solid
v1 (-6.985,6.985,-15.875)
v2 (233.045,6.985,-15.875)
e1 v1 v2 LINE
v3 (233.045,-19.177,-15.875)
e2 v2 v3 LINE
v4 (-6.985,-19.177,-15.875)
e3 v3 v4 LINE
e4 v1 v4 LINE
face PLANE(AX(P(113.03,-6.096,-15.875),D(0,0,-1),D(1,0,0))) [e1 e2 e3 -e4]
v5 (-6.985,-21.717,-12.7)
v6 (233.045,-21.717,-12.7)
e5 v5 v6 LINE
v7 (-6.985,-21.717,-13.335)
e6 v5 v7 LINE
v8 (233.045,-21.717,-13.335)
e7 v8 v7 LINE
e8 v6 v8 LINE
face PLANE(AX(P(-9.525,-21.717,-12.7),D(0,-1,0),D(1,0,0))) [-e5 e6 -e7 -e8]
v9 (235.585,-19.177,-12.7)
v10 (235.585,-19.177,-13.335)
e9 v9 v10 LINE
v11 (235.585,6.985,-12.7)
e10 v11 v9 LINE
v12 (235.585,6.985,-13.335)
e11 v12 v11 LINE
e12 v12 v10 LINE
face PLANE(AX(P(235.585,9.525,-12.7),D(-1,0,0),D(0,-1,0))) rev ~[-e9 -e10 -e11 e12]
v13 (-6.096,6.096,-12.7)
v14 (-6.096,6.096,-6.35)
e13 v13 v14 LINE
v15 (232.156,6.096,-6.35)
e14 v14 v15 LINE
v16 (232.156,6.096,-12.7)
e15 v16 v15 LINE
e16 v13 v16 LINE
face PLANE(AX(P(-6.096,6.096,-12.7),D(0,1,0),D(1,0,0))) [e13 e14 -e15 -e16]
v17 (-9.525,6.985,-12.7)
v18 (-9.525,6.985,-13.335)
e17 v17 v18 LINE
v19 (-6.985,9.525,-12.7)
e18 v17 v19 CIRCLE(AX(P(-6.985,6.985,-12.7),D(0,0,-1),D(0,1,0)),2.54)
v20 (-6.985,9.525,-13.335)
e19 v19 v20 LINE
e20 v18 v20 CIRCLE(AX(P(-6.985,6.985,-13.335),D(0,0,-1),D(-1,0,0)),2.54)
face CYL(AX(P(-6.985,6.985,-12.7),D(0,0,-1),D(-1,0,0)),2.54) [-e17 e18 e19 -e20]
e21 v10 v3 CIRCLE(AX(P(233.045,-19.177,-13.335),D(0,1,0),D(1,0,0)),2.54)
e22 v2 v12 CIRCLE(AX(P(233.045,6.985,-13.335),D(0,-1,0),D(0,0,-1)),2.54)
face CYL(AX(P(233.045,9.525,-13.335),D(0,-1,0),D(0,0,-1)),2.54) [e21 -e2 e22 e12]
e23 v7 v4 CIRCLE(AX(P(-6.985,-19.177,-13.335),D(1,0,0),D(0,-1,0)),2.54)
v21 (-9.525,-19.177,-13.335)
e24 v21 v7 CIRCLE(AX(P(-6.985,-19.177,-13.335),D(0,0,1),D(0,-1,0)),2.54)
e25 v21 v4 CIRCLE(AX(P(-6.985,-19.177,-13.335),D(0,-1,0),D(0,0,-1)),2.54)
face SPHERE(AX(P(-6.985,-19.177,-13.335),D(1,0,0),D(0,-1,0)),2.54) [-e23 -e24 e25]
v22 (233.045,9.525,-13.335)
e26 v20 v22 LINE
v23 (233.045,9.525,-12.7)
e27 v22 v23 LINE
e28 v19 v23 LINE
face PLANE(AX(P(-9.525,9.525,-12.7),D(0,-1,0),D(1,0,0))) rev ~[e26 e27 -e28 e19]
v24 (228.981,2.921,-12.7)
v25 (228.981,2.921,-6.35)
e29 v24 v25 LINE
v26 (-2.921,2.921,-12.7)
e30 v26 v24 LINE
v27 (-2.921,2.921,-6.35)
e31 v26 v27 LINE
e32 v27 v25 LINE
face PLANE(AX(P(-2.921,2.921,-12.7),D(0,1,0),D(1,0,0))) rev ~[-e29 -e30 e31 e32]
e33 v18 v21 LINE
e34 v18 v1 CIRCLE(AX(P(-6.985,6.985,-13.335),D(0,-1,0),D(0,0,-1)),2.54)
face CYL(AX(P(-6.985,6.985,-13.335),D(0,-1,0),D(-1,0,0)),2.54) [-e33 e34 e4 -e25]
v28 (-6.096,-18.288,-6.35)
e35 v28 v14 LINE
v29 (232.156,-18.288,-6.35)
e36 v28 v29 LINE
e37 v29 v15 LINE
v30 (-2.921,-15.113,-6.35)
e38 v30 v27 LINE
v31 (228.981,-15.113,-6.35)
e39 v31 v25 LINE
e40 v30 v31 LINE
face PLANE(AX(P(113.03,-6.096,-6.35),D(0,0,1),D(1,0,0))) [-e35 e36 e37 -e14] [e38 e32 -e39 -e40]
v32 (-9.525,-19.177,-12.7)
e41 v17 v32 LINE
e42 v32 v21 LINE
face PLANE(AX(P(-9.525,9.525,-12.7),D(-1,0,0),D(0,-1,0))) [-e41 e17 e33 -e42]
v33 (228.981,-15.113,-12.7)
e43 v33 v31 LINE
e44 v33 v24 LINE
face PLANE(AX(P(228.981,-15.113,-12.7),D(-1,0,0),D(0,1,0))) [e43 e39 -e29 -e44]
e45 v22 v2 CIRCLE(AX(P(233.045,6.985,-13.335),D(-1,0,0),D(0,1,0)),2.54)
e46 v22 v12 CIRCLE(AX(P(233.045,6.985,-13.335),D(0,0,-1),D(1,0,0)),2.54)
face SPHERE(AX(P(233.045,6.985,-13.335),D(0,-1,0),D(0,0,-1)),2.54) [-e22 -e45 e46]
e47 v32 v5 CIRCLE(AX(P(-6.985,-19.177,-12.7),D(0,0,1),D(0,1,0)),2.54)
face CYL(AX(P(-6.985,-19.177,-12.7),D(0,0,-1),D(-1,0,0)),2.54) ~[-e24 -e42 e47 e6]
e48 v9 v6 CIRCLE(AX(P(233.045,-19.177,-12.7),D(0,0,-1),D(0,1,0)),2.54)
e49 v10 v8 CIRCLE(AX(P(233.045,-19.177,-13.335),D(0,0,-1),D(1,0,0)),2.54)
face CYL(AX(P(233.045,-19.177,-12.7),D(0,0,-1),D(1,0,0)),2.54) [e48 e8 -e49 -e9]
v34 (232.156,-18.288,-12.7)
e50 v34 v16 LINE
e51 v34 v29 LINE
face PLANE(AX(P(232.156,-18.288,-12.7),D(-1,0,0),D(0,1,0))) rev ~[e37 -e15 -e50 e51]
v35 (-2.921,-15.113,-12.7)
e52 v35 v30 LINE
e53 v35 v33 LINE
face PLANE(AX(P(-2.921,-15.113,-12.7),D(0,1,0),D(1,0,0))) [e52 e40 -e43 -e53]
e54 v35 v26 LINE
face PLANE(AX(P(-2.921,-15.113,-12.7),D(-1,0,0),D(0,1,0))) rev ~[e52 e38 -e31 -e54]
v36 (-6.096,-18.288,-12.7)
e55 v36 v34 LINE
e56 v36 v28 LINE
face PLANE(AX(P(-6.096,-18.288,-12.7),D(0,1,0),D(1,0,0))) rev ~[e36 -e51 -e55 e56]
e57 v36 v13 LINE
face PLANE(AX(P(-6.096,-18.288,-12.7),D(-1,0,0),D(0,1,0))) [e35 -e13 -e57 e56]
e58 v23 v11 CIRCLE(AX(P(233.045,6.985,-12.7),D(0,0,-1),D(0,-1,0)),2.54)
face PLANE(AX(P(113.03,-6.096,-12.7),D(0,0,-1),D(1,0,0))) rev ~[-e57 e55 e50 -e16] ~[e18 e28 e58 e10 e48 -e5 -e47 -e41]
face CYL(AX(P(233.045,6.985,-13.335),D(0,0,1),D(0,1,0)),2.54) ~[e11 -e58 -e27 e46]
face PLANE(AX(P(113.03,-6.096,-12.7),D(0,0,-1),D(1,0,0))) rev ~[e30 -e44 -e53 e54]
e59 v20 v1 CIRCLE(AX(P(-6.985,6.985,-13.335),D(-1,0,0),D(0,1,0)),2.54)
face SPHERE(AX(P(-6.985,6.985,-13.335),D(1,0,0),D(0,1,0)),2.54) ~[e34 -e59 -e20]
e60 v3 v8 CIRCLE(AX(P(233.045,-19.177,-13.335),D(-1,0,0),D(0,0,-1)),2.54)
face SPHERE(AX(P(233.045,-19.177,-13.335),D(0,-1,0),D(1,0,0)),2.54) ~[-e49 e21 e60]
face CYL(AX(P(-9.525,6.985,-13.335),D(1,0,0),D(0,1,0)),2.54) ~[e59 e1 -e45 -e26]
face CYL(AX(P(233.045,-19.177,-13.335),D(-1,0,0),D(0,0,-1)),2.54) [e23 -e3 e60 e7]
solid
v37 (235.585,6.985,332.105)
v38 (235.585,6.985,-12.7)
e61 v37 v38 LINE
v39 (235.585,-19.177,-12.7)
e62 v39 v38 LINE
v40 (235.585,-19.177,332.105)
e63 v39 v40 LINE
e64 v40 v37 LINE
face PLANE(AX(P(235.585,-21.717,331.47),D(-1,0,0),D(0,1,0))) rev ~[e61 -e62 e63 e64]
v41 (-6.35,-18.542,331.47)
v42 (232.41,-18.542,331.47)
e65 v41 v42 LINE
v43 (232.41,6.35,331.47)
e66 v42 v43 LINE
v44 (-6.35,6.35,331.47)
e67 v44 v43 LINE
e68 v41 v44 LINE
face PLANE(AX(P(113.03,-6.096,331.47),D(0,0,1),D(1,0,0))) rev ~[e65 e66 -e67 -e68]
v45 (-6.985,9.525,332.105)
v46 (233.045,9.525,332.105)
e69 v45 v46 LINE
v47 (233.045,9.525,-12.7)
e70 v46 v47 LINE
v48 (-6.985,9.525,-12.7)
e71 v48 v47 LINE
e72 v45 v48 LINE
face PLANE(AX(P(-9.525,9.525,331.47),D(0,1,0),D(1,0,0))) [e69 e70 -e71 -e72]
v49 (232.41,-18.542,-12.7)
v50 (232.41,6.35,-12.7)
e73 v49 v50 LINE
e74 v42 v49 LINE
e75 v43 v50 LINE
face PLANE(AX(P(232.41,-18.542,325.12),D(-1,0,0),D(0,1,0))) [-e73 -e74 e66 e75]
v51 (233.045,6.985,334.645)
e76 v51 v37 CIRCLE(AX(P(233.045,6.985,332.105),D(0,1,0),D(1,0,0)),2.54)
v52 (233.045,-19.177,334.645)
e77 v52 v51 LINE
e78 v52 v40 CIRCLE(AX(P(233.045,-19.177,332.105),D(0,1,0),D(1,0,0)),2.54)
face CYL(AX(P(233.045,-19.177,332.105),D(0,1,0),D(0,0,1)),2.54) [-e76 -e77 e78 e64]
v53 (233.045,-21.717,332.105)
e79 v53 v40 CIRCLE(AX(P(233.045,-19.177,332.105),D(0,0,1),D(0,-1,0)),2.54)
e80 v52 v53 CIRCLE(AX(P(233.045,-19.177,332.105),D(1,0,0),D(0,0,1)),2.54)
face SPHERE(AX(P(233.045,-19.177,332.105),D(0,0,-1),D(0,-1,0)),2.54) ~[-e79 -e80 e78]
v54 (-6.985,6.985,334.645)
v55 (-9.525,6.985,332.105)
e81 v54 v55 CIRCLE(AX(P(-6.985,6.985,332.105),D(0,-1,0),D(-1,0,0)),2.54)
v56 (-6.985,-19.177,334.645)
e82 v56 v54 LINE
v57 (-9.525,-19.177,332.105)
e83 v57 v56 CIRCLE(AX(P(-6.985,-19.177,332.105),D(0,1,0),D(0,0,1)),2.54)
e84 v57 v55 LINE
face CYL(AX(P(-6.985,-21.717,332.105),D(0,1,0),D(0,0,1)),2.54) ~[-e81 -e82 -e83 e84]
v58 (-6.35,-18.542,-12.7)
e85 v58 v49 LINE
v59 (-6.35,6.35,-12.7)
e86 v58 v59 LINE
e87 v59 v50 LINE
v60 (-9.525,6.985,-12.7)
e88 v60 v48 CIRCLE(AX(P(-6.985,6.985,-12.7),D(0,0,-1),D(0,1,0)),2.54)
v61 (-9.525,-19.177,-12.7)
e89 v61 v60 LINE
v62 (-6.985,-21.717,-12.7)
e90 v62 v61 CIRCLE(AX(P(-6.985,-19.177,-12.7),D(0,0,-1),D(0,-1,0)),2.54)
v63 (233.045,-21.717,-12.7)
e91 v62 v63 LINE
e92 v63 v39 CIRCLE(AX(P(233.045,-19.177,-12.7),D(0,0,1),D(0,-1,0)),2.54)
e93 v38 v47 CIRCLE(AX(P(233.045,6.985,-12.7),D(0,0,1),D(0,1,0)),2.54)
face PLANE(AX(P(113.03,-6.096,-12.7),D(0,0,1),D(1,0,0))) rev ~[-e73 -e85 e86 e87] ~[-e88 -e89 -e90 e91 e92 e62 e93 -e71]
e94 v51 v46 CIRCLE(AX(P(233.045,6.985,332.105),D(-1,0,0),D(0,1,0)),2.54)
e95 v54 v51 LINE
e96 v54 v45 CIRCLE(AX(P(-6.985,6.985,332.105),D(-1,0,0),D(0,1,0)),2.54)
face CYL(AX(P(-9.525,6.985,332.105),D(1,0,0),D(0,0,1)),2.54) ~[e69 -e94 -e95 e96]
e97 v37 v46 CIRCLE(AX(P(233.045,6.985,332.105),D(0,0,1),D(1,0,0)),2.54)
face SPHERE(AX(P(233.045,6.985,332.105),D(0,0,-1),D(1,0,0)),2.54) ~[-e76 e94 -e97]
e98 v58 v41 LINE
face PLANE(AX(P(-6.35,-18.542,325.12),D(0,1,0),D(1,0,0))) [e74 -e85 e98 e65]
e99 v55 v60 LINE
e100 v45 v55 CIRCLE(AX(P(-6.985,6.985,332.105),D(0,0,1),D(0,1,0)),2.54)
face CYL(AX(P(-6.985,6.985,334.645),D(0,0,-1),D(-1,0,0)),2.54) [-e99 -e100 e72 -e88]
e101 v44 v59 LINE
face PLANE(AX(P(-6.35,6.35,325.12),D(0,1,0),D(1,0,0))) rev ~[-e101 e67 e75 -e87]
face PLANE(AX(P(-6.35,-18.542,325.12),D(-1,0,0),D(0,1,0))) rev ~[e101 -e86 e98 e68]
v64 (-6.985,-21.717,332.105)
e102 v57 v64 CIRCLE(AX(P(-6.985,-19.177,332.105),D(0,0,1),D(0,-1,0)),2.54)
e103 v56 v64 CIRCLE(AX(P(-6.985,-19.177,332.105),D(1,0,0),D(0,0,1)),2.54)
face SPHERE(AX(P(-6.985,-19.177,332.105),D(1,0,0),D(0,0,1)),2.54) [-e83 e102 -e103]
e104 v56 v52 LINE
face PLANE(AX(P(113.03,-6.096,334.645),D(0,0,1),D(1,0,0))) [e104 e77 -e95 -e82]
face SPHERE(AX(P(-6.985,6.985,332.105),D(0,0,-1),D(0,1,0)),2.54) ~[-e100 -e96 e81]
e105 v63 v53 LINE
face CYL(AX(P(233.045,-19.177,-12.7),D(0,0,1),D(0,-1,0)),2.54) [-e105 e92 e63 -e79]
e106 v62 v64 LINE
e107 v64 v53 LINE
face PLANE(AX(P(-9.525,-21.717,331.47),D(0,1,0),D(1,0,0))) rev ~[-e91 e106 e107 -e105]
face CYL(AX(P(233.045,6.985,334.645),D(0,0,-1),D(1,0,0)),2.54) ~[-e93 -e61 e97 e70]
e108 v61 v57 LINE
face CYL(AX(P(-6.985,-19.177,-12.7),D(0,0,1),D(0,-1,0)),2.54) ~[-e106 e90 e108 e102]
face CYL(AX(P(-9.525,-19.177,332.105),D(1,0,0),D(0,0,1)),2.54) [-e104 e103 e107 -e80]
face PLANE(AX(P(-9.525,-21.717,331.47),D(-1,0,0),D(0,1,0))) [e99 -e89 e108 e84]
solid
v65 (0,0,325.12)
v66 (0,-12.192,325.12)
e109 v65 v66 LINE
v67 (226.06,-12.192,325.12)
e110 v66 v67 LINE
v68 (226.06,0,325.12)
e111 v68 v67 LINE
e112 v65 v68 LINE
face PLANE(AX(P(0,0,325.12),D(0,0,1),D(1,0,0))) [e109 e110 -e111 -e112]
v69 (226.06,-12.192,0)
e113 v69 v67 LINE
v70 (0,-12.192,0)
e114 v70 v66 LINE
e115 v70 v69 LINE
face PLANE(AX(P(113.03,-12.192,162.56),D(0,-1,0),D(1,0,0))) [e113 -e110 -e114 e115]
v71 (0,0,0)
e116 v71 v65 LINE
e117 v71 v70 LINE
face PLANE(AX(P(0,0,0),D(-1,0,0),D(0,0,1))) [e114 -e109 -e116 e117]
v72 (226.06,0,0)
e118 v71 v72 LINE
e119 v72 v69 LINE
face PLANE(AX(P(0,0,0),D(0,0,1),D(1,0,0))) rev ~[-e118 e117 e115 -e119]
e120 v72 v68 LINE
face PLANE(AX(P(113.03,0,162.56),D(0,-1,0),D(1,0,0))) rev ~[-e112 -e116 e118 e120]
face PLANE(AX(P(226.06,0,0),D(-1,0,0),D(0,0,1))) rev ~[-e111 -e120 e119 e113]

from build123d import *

# Parameters (mm, degrees)
F0_W          = 226.06
F0_H          = 325.12
F1_DEPTH      = 12.192
F2_W          = 245.11
F2_H          = 31.242
F2_W_2        = 238.76
F2_H_2        = 24.892
F3_DEPTH      = 337.82
F3_DEPTH_BACK = 6.35
F4_W          = 245.11
F4_H          = 31.242
F5_DEPTH      = 3.175
F6_W          = 245.11
F6_H          = 31.242
F7_DEPTH      = 3.175
F8_W          = 238.252
F8_H          = 24.384
F8_W_2        = 231.902
F8_H_2        = 18.034
F9_DEPTH      = 6.35
F10_R         = 2.54
F11_R         = 2.54
F11_2_R       = 2.54
F12_R         = 2.54
F12_2_R       = 2.54


# Not quite as in the source:
# - two fillets or chamfers of one size are made in one step


with BuildPart() as f1:
    # F0 (on Front) → F1 (new body)
    with BuildSketch(Plane.XZ):
        with Locations((113.03, 162.56)):
            Rectangle(F0_W, F0_H)
    extrude(amount=F1_DEPTH)


with BuildPart() as f3:
    # F2 (on face) → F3 (new body, two sides)
    with BuildSketch(Plane.XY.offset(325.12)) as f3_sk:
        with Locations((113.03, -6.096)):
            Rectangle(F2_W, F2_H)
        with Locations((113.03, -6.096)):
            Rectangle(F2_W_2, F2_H_2, mode=Mode.SUBTRACT)
    extrude(amount=-F3_DEPTH)
    extrude(f3_sk.sketch, amount=F3_DEPTH_BACK)

    # F4 (on face) → F5 (join)
    with BuildSketch(Plane.XY.offset(331.47)):
        with Locations((113.03, -6.096)):
            Rectangle(F4_W, F4_H)
    extrude(amount=F5_DEPTH)

    # F11
    f11_edges = [f3.edges().sort_by_distance(p)[0] for p in [
        (235.585, -21.717, 160.9725),
    ]]
    fillet(f11_edges, radius=F11_R)

    # F12
    f12_edges = [f3.edges().sort_by_distance(p)[0] for p in [
        (235.585, 9.525, 160.9725),
        (235.585, -4.826, 334.645),
        (234.841051, -20.973051, 334.645),
        (-9.525, 9.525, 160.9725),
        (113.03, 9.525, 334.645),
        (111.76, -21.717, 334.645),
        (-9.525, -6.096, 334.645),
        (-9.525, -21.717, 160.9725),
    ]]
    fillet(f12_edges, radius=F12_R)


with BuildPart() as f7:
    # F6 (on face) → F7 (new body)
    with BuildSketch(Plane(origin=(0, 0, -12.7), x_dir=(1, 0, 0), z_dir=(0, 0, -1))):
        with Locations((113.03, 6.096)):
            Rectangle(F6_W, F6_H)
    extrude(amount=F7_DEPTH)

    # F8 (on face) → F9 (join)
    with BuildSketch(Plane.XY.offset(-12.7)):
        with Locations((113.03, -6.096)):
            Rectangle(F8_W, F8_H)
        with Locations((113.03, -6.096)):
            Rectangle(F8_W_2, F8_H_2, mode=Mode.SUBTRACT)
    extrude(amount=F9_DEPTH)

    # F10
    f10_edges = [f7.edges().sort_by_distance(p)[0] for p in [
        (235.585, -6.096, -15.875),
    ]]
    fillet(f10_edges, radius=F10_R)

    # F11#2
    f11_2_edges = [f7.edges().sort_by_distance(p)[0] for p in [
        (111.76, 9.525, -15.875),
    ]]
    fillet(f11_2_edges, radius=F11_2_R)

    # F12#2
    f12_2_edges = [f7.edges().sort_by_distance(p)[0] for p in [
        (235.585, -21.717, -13.0175),
        (234.841051, -21.717, -15.131051),
        (111.76, -21.717, -15.875),
        (-9.525, -21.717, -14.2875),
        (-9.525, -7.366, -15.875),
        (-9.525, 9.525, -13.0175),
        (-9.525, 8.781051, -15.131051),
    ]]
    fillet(f12_2_edges, radius=F12_2_R)


solid = Compound([f1.part, f3.part, f7.part])
